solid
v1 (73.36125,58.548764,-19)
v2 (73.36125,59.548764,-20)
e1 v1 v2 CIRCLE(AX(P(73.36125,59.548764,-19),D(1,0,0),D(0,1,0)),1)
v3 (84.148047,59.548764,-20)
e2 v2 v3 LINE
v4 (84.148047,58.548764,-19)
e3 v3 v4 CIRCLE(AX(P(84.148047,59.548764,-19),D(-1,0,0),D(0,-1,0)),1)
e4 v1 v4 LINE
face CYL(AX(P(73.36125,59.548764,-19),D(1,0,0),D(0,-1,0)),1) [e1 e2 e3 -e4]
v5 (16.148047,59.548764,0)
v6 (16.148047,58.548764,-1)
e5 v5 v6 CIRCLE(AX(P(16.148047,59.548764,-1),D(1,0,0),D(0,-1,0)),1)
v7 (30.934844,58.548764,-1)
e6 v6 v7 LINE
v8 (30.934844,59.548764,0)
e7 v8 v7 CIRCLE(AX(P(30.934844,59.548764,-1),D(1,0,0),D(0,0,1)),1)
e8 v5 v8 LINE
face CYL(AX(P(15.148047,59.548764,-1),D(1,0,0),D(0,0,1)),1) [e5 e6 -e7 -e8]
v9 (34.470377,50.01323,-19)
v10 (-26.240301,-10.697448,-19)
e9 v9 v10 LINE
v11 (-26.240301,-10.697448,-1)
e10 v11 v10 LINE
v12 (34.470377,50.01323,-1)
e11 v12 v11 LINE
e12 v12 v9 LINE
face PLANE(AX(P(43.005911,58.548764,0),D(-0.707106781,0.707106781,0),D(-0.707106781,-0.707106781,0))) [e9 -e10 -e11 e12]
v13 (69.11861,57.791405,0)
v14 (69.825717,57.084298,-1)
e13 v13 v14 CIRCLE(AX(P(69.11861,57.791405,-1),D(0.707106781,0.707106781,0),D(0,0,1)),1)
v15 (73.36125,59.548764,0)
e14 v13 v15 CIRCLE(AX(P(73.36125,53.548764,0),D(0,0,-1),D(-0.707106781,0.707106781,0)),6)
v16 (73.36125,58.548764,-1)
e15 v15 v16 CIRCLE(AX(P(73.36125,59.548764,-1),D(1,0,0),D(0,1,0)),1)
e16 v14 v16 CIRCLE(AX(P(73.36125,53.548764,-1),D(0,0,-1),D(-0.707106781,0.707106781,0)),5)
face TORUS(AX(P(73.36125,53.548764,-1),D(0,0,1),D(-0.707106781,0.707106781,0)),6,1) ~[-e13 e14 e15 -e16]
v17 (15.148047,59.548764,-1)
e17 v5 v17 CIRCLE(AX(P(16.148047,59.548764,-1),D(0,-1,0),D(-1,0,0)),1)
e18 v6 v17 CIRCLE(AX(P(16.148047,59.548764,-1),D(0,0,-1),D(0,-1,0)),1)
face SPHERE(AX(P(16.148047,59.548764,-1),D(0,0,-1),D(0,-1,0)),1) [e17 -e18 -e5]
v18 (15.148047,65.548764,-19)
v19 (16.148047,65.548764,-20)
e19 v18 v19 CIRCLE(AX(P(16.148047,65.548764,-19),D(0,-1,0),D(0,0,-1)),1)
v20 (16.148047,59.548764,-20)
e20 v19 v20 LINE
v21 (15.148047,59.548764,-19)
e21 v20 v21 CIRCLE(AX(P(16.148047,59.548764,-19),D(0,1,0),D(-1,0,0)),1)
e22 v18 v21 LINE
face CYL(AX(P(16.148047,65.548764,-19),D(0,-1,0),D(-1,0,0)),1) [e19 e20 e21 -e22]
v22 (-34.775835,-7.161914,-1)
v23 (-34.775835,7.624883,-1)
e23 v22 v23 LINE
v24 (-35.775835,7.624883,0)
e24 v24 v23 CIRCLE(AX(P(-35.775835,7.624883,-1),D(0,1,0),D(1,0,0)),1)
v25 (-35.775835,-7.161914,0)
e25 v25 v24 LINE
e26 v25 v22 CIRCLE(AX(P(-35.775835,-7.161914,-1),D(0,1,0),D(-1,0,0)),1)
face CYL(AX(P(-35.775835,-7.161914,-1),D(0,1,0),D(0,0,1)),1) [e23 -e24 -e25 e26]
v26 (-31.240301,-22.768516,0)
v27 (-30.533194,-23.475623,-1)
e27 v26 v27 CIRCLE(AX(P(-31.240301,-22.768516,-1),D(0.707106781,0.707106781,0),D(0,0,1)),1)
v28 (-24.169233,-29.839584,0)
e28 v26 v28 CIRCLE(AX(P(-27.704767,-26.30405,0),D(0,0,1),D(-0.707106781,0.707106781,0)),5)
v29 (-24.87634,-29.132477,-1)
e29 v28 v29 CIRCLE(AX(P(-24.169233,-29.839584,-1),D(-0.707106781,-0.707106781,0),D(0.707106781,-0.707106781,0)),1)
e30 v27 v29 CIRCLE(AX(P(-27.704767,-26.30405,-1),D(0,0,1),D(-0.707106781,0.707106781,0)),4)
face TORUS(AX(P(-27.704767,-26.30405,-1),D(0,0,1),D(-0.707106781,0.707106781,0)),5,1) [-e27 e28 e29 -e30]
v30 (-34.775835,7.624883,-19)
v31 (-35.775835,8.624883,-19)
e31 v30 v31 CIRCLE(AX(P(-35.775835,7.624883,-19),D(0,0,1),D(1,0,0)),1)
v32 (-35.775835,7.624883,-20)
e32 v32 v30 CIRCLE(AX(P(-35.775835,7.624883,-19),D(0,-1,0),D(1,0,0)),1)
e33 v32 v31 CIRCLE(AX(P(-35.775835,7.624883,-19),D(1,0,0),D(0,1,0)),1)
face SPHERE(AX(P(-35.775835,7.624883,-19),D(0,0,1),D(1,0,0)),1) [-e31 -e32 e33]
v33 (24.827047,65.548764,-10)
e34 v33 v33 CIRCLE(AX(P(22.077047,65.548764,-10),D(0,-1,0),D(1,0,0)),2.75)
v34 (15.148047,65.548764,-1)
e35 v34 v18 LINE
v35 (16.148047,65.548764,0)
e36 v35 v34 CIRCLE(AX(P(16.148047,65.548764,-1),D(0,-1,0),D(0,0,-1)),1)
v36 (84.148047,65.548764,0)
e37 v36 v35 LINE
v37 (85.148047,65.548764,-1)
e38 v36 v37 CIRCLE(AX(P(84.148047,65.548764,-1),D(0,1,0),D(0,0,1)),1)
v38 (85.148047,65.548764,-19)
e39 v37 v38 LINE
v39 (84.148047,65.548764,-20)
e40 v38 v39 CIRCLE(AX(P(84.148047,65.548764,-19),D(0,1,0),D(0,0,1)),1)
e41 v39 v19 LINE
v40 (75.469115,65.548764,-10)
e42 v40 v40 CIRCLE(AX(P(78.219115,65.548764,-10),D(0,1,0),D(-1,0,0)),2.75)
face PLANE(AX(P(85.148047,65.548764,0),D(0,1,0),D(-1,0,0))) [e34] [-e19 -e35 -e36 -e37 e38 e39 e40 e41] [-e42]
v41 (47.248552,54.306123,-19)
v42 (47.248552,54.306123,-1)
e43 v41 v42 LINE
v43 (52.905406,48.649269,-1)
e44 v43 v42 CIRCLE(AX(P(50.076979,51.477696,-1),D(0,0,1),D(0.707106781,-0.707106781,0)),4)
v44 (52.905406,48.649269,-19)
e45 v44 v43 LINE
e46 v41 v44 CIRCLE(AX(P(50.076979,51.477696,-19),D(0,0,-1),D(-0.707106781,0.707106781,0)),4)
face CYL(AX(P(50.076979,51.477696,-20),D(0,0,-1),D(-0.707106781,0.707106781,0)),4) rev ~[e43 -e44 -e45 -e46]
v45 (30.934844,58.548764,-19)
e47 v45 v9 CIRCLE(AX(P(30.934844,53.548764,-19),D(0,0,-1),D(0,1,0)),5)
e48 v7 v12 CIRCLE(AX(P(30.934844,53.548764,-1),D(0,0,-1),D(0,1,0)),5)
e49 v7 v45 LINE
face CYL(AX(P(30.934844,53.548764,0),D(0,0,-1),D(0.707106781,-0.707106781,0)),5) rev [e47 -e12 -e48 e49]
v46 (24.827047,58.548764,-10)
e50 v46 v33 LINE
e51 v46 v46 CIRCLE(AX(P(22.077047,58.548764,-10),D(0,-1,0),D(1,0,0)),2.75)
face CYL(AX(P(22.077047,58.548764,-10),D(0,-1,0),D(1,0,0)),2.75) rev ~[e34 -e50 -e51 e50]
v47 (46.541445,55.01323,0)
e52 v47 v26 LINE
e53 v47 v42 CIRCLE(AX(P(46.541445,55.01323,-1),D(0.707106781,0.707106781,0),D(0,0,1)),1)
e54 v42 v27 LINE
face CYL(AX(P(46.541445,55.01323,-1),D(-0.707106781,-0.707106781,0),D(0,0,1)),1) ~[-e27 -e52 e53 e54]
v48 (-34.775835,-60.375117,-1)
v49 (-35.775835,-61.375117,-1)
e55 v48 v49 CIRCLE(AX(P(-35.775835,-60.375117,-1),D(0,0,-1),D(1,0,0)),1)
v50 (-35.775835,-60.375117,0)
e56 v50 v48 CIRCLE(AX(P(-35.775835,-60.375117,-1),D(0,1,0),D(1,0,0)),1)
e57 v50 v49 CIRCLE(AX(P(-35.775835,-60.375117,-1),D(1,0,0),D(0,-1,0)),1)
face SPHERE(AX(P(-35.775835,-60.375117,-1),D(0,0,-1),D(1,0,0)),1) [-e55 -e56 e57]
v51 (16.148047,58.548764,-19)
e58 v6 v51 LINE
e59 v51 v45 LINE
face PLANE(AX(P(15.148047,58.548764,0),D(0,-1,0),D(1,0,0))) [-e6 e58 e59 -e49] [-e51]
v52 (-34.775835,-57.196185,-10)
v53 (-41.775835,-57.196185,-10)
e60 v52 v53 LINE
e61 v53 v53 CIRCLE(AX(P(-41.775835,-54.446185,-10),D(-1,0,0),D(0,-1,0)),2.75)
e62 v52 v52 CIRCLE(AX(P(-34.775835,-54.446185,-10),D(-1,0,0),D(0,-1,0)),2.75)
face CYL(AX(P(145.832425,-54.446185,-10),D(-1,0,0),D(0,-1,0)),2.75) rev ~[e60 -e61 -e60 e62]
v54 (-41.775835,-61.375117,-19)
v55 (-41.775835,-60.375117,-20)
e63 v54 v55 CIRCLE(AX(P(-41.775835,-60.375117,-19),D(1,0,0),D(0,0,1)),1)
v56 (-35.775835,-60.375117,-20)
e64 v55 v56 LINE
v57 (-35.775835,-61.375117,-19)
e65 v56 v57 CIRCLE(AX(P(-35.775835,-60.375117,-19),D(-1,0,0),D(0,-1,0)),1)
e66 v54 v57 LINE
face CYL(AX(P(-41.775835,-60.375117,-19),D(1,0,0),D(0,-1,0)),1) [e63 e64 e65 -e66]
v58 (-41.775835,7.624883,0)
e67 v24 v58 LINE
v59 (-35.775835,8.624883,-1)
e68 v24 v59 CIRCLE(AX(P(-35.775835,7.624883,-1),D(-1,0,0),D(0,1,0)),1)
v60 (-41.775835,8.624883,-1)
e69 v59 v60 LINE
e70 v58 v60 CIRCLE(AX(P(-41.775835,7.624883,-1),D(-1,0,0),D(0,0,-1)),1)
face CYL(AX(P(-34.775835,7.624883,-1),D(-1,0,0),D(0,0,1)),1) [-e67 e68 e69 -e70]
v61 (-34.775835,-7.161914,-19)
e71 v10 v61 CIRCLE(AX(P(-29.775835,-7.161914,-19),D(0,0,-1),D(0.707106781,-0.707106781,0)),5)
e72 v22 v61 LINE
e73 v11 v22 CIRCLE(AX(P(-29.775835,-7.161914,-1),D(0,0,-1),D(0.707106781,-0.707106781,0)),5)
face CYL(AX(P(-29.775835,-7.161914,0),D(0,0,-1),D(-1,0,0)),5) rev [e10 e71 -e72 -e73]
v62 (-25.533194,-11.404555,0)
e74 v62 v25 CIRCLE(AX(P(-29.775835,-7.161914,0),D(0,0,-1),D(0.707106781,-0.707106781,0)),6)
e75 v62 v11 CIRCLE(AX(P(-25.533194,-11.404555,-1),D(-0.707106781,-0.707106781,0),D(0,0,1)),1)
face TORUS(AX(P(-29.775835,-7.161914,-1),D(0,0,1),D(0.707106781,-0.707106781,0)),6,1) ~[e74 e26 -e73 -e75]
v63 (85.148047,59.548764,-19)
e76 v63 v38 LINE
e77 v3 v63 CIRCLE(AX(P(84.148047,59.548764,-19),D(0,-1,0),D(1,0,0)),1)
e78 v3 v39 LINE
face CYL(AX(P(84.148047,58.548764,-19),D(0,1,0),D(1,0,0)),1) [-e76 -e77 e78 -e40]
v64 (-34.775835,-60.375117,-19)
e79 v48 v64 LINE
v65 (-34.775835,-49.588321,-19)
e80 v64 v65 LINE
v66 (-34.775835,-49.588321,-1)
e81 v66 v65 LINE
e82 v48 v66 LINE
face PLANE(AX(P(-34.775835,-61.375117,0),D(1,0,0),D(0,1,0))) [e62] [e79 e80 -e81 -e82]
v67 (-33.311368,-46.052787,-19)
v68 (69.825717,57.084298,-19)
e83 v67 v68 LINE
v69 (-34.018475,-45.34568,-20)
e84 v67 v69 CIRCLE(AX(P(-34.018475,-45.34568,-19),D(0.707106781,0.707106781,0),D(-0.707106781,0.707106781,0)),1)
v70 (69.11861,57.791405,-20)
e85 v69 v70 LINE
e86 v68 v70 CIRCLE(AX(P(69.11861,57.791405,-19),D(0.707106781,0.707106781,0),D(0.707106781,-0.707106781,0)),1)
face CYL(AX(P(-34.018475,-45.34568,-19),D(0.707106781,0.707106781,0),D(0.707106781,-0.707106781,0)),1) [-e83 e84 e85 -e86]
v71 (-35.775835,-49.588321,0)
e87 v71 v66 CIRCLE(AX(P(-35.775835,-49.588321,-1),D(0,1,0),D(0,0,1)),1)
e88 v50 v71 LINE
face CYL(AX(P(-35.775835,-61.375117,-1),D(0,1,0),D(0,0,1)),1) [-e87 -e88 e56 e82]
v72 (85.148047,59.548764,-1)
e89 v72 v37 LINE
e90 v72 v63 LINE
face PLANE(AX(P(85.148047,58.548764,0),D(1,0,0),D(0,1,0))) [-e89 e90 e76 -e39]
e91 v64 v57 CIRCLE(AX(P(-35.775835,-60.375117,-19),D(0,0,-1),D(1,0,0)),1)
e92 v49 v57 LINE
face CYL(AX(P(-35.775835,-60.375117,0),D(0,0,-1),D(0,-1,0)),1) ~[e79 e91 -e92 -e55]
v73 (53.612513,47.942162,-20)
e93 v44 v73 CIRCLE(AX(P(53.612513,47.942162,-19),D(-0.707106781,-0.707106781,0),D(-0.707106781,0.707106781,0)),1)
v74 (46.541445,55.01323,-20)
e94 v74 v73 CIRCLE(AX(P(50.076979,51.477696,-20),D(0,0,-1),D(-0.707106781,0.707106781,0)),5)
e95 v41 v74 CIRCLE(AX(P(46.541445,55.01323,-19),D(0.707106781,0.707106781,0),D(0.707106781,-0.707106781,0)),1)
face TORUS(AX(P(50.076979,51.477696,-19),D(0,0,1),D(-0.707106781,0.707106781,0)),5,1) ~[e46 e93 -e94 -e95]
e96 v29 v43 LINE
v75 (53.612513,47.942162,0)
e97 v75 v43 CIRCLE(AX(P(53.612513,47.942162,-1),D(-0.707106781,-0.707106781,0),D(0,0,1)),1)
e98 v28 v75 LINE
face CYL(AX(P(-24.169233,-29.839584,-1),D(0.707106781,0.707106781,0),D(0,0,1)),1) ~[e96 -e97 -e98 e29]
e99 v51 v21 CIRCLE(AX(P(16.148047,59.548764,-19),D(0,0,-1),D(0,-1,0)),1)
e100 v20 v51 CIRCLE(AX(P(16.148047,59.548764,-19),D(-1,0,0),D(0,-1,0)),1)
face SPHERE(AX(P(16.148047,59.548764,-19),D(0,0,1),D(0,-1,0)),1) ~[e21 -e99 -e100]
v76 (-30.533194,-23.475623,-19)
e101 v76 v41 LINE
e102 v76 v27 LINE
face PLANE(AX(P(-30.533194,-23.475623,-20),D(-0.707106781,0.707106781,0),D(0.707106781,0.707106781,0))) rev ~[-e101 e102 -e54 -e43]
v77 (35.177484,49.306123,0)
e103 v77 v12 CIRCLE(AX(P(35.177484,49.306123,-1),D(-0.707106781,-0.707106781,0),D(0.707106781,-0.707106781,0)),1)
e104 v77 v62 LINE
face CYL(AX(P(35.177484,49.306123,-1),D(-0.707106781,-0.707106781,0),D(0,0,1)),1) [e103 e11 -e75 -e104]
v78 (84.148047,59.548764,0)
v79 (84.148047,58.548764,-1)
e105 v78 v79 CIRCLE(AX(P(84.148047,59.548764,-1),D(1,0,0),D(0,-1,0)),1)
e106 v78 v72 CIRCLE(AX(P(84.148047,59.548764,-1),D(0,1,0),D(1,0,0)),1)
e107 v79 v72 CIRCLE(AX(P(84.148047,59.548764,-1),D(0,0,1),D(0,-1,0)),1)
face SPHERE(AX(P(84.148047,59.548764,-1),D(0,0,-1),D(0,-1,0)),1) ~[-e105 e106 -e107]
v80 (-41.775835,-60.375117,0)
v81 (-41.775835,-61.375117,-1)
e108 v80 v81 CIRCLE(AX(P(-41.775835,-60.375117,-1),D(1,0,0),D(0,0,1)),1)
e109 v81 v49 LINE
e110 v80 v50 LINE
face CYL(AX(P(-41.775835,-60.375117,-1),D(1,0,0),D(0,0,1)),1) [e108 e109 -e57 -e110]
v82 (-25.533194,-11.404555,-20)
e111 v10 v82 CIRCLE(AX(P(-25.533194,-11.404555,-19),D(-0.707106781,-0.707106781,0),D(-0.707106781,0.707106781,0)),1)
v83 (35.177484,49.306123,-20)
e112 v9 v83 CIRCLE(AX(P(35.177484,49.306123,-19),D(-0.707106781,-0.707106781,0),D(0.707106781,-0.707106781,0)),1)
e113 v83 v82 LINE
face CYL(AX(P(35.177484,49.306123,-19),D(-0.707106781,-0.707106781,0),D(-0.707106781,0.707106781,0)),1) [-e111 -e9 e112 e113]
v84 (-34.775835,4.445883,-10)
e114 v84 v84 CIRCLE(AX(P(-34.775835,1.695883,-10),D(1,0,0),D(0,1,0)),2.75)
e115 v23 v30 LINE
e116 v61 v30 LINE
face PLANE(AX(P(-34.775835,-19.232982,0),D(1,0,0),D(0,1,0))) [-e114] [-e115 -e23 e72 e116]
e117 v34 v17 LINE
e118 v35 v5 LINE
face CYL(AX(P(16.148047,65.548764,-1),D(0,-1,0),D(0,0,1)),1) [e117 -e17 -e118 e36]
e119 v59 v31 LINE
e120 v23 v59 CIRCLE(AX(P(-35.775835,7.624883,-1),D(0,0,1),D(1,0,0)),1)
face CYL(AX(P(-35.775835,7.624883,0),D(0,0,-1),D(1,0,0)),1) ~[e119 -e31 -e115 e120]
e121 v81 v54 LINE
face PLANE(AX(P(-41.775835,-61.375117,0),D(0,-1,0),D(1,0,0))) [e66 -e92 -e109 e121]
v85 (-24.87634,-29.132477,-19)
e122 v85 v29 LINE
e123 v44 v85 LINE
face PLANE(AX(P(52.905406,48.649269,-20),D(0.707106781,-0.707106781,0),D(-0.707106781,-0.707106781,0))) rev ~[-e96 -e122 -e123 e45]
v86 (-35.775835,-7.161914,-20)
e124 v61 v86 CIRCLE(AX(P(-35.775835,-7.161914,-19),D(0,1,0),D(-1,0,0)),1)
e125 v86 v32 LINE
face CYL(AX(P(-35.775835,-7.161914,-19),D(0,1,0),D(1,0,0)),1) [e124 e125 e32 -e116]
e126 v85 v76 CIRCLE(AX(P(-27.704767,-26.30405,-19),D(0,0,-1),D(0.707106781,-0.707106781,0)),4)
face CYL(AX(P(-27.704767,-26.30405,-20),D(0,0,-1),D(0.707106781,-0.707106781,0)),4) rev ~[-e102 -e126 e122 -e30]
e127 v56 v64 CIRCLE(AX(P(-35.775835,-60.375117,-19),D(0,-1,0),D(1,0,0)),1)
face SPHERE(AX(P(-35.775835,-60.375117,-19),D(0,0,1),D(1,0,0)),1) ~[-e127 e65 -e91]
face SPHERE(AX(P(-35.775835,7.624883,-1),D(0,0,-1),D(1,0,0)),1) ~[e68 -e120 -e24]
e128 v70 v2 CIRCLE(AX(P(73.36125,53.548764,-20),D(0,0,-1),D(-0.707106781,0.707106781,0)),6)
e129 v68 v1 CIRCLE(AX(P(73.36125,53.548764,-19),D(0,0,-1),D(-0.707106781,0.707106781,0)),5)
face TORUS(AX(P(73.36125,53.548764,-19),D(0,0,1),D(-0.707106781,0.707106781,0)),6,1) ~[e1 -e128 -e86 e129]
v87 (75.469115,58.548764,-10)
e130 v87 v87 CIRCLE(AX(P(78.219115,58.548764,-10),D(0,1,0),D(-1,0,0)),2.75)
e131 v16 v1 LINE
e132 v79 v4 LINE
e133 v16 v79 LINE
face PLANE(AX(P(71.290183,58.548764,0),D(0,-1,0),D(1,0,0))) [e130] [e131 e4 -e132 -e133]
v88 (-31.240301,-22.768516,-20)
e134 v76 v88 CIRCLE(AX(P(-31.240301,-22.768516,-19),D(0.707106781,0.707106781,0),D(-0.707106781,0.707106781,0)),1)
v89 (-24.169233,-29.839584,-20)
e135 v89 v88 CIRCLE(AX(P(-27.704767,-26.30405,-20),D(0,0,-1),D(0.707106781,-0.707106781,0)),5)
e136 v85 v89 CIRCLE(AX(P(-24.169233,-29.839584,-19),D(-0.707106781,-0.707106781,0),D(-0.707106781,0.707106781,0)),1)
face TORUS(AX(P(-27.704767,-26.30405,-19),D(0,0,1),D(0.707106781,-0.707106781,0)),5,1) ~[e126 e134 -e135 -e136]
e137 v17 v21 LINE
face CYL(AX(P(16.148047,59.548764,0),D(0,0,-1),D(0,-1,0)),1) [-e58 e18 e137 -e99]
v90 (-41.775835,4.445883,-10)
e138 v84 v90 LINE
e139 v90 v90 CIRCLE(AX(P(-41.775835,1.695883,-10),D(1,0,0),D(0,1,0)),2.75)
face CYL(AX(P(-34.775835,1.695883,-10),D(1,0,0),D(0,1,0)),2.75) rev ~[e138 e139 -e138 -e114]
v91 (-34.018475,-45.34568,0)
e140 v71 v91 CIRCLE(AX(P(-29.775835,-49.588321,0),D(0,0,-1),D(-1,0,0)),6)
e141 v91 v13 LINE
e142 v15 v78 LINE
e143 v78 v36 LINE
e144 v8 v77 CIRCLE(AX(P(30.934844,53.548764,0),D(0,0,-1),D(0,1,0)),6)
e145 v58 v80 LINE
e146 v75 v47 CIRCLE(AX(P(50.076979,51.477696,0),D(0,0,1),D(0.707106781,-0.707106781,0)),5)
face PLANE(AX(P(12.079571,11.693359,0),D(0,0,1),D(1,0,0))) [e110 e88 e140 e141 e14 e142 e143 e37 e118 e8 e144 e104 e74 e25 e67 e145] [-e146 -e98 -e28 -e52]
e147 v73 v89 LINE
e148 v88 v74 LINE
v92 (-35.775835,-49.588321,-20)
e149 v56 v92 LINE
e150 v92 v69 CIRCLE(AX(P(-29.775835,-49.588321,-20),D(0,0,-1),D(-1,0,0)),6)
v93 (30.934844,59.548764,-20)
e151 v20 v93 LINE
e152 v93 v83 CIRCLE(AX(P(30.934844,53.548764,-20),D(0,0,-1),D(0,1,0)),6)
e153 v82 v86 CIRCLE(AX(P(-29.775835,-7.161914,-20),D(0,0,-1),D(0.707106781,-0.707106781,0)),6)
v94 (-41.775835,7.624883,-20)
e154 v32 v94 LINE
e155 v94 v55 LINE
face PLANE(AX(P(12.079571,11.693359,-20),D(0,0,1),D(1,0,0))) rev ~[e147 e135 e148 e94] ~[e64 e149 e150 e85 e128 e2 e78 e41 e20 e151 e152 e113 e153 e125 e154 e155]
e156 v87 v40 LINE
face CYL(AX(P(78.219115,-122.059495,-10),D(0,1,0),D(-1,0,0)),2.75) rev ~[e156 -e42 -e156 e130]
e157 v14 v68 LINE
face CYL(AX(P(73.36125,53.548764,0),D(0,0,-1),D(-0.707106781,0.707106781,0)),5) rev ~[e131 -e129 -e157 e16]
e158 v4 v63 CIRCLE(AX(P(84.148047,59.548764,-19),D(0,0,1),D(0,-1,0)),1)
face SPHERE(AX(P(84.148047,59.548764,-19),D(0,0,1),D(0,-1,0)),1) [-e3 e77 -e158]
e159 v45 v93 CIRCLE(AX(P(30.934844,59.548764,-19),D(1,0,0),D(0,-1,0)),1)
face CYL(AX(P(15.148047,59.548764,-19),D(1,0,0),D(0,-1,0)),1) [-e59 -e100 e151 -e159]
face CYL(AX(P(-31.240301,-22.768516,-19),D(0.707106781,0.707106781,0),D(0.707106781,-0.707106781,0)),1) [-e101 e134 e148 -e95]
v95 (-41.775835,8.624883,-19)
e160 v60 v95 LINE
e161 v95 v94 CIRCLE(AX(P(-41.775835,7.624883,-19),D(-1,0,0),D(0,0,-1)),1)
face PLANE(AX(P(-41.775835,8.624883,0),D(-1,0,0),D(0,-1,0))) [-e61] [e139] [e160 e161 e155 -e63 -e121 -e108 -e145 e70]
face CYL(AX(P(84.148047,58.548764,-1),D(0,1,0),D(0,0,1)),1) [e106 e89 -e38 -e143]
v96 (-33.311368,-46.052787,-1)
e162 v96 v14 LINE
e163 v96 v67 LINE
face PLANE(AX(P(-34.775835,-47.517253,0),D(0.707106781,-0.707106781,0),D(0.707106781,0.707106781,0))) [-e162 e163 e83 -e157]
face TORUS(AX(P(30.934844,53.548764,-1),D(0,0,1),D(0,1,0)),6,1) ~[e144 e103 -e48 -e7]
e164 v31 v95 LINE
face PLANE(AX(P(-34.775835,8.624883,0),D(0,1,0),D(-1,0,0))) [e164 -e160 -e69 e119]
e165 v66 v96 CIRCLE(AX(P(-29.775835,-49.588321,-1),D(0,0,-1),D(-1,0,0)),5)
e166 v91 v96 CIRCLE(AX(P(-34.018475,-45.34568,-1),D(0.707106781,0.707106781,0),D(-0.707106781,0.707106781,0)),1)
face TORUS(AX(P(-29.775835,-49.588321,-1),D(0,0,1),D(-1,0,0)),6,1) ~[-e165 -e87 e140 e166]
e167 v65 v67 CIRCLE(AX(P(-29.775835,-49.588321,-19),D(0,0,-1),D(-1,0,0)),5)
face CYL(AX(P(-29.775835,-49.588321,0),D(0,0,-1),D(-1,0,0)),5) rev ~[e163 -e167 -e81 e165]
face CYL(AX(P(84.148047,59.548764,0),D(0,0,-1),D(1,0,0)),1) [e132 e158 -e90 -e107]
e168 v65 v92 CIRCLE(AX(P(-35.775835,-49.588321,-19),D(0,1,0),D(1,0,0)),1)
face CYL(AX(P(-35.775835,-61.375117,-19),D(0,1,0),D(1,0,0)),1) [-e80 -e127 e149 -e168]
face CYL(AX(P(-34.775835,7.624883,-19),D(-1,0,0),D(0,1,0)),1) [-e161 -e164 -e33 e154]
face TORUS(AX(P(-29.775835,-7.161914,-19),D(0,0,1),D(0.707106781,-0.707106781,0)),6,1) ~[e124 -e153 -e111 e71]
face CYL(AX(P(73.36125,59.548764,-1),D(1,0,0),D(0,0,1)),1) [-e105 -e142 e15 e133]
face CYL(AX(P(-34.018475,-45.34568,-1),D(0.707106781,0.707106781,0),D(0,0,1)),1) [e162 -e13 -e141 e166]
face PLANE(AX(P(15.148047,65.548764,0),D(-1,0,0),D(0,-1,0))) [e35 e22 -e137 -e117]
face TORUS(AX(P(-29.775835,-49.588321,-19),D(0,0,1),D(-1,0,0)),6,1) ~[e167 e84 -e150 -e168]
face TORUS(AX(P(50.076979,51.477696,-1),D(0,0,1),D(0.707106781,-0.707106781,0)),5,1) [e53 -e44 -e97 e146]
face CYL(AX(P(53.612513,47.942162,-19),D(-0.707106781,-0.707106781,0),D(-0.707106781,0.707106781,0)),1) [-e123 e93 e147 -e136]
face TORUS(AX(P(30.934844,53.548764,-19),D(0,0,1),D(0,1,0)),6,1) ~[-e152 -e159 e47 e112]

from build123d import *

# Parameters (mm, degrees)
F1_DEPTH       = 20
F6_D           = 5.5
F6_DEPTH       = 7.001
F6_ON_F3_D     = 5.5
F6_ON_F4_D     = 5.5
F6_ON_F4_DEPTH = 7.001
F6_ON_F2_D     = 5.5
F7_R           = 5
F8_R           = 5
F10_DEPTH      = 20.001
F11_R          = 1


# Not quite as in the source:
# - a feature names something its author has since deleted; it is built from what else it names


with BuildPart() as f1:
    # F0 (on Top) → F1 (new body)
    with BuildSketch(Plane.XY):
        Polygon((71.2901826474, 58.548764092), (43.0059113999, 58.548764092), (-34.7758345306, -19.2329818385), (-34.7758345306, -47.517253086), align=None)
        Polygon((85.1480470237, 65.548764092), (15.1480470237, 65.548764092), (15.1480470237, 58.548764092), (43.0059113999, 58.548764092), (71.2901826474, 58.548764092), (85.1480470237, 58.548764092), align=None)
        Polygon((-34.7758345306, -47.517253086), (-34.7758345306, -19.2329818385), (-34.7758345306, 8.6248825378), (-41.7758345306, 8.6248825378), (-41.7758345306, -61.3751174622), (-34.7758345306, -61.3751174622), align=None)
    extrude(amount=-F1_DEPTH)

    # F6 (through all, one way)
    with BuildSketch(Plane.YZ.offset(-34.7758345306)):
        with Locations((1.6958825378, -10)):
            Circle(F6_D / 2)
    extrude(amount=-F6_DEPTH, mode=Mode.SUBTRACT)

    # F6 on F3 (through all)
    with Locations(Plane.YZ.offset(-34.7758345306)):
        with Locations((-54.4461852741, -10)):
            Hole(F6_ON_F3_D / 2)

    # F6 on F4 (through all, one way)
    with BuildSketch(Plane.XZ.offset(-58.548764092)):
        with Locations((22.0770470237, -10)):
            Circle(F6_ON_F4_D / 2)
    extrude(amount=-F6_ON_F4_DEPTH, mode=Mode.SUBTRACT)

    # F6 on F2 (through all)
    with Locations(Plane.XZ.offset(-58.548764092)):
        with Locations((78.2191148355, -10)):
            Hole(F6_ON_F2_D / 2)

    # F7
    f7_edges = [f1.edges().sort_by_distance(p)[0] for p in [
        (-34.775835, -47.517253, -10),
        (71.290183, 58.548764, -10),
    ]]
    fillet(f7_edges, radius=F7_R)

    # F8
    f8_edges = [f1.edges().sort_by_distance(p)[0] for p in [
        (-34.775835, -19.232982, -10),
        (43.005911, 58.548764, -10),
    ]]
    fillet(f8_edges, radius=F8_R)

    # F9 (on face) → F10 (cut, through all)
    with BuildSketch(Plane(origin=(0, 0, -20), x_dir=(1, 0, 0), z_dir=(0, 0, -1))):
        with BuildLine():
            ThreePointArc((47.248552087, -54.3061234049), (52.9054063365, -54.3061234049), (52.9054063365, -48.6492691554))
            Line((52.9054063365, -48.6492691554), (-24.876339594, 29.1324767751))
            ThreePointArc((-24.876339594, 29.1324767751), (-30.5331938435, 29.1324767751), (-30.5331938435, 23.4756225256))
            Line((-30.5331938435, 23.4756225256), (47.248552087, -54.3061234049))
        make_face()
    extrude(amount=-F10_DEPTH, mode=Mode.SUBTRACT)

    # F11
    f11_edges = [f1.edges().sort_by_distance(p)[0] for p in [
        (85.148047, 58.548764, -10),
        (15.148047, 58.548764, -10),
        (-34.775835, 8.624883, -10),
        (-34.775835, -61.375117, -10),
        (14.014533, 9.758396, -20),
        (8.357679, 15.41525, 0),
        (-34.775835, 0.731484, 0),
        (-34.775835, 0.731484, -20),
        (-34.775835, -55.481719, 0),
        (-34.775835, -55.481719, -20),
        (-38.275835, -61.375117, -20),
        (-38.275835, 8.624883, -20),
        (-38.275835, 8.624883, 0),
        (15.148047, 62.048764, -20),
        (85.148047, 62.048764, -20),
        (85.148047, 62.048764, 0),
        (15.148047, 62.048764, 0),
        (-38.275835, -61.375117, 0),
    ]]
    fillet(f11_edges, radius=F11_R)


solid = f1.part
